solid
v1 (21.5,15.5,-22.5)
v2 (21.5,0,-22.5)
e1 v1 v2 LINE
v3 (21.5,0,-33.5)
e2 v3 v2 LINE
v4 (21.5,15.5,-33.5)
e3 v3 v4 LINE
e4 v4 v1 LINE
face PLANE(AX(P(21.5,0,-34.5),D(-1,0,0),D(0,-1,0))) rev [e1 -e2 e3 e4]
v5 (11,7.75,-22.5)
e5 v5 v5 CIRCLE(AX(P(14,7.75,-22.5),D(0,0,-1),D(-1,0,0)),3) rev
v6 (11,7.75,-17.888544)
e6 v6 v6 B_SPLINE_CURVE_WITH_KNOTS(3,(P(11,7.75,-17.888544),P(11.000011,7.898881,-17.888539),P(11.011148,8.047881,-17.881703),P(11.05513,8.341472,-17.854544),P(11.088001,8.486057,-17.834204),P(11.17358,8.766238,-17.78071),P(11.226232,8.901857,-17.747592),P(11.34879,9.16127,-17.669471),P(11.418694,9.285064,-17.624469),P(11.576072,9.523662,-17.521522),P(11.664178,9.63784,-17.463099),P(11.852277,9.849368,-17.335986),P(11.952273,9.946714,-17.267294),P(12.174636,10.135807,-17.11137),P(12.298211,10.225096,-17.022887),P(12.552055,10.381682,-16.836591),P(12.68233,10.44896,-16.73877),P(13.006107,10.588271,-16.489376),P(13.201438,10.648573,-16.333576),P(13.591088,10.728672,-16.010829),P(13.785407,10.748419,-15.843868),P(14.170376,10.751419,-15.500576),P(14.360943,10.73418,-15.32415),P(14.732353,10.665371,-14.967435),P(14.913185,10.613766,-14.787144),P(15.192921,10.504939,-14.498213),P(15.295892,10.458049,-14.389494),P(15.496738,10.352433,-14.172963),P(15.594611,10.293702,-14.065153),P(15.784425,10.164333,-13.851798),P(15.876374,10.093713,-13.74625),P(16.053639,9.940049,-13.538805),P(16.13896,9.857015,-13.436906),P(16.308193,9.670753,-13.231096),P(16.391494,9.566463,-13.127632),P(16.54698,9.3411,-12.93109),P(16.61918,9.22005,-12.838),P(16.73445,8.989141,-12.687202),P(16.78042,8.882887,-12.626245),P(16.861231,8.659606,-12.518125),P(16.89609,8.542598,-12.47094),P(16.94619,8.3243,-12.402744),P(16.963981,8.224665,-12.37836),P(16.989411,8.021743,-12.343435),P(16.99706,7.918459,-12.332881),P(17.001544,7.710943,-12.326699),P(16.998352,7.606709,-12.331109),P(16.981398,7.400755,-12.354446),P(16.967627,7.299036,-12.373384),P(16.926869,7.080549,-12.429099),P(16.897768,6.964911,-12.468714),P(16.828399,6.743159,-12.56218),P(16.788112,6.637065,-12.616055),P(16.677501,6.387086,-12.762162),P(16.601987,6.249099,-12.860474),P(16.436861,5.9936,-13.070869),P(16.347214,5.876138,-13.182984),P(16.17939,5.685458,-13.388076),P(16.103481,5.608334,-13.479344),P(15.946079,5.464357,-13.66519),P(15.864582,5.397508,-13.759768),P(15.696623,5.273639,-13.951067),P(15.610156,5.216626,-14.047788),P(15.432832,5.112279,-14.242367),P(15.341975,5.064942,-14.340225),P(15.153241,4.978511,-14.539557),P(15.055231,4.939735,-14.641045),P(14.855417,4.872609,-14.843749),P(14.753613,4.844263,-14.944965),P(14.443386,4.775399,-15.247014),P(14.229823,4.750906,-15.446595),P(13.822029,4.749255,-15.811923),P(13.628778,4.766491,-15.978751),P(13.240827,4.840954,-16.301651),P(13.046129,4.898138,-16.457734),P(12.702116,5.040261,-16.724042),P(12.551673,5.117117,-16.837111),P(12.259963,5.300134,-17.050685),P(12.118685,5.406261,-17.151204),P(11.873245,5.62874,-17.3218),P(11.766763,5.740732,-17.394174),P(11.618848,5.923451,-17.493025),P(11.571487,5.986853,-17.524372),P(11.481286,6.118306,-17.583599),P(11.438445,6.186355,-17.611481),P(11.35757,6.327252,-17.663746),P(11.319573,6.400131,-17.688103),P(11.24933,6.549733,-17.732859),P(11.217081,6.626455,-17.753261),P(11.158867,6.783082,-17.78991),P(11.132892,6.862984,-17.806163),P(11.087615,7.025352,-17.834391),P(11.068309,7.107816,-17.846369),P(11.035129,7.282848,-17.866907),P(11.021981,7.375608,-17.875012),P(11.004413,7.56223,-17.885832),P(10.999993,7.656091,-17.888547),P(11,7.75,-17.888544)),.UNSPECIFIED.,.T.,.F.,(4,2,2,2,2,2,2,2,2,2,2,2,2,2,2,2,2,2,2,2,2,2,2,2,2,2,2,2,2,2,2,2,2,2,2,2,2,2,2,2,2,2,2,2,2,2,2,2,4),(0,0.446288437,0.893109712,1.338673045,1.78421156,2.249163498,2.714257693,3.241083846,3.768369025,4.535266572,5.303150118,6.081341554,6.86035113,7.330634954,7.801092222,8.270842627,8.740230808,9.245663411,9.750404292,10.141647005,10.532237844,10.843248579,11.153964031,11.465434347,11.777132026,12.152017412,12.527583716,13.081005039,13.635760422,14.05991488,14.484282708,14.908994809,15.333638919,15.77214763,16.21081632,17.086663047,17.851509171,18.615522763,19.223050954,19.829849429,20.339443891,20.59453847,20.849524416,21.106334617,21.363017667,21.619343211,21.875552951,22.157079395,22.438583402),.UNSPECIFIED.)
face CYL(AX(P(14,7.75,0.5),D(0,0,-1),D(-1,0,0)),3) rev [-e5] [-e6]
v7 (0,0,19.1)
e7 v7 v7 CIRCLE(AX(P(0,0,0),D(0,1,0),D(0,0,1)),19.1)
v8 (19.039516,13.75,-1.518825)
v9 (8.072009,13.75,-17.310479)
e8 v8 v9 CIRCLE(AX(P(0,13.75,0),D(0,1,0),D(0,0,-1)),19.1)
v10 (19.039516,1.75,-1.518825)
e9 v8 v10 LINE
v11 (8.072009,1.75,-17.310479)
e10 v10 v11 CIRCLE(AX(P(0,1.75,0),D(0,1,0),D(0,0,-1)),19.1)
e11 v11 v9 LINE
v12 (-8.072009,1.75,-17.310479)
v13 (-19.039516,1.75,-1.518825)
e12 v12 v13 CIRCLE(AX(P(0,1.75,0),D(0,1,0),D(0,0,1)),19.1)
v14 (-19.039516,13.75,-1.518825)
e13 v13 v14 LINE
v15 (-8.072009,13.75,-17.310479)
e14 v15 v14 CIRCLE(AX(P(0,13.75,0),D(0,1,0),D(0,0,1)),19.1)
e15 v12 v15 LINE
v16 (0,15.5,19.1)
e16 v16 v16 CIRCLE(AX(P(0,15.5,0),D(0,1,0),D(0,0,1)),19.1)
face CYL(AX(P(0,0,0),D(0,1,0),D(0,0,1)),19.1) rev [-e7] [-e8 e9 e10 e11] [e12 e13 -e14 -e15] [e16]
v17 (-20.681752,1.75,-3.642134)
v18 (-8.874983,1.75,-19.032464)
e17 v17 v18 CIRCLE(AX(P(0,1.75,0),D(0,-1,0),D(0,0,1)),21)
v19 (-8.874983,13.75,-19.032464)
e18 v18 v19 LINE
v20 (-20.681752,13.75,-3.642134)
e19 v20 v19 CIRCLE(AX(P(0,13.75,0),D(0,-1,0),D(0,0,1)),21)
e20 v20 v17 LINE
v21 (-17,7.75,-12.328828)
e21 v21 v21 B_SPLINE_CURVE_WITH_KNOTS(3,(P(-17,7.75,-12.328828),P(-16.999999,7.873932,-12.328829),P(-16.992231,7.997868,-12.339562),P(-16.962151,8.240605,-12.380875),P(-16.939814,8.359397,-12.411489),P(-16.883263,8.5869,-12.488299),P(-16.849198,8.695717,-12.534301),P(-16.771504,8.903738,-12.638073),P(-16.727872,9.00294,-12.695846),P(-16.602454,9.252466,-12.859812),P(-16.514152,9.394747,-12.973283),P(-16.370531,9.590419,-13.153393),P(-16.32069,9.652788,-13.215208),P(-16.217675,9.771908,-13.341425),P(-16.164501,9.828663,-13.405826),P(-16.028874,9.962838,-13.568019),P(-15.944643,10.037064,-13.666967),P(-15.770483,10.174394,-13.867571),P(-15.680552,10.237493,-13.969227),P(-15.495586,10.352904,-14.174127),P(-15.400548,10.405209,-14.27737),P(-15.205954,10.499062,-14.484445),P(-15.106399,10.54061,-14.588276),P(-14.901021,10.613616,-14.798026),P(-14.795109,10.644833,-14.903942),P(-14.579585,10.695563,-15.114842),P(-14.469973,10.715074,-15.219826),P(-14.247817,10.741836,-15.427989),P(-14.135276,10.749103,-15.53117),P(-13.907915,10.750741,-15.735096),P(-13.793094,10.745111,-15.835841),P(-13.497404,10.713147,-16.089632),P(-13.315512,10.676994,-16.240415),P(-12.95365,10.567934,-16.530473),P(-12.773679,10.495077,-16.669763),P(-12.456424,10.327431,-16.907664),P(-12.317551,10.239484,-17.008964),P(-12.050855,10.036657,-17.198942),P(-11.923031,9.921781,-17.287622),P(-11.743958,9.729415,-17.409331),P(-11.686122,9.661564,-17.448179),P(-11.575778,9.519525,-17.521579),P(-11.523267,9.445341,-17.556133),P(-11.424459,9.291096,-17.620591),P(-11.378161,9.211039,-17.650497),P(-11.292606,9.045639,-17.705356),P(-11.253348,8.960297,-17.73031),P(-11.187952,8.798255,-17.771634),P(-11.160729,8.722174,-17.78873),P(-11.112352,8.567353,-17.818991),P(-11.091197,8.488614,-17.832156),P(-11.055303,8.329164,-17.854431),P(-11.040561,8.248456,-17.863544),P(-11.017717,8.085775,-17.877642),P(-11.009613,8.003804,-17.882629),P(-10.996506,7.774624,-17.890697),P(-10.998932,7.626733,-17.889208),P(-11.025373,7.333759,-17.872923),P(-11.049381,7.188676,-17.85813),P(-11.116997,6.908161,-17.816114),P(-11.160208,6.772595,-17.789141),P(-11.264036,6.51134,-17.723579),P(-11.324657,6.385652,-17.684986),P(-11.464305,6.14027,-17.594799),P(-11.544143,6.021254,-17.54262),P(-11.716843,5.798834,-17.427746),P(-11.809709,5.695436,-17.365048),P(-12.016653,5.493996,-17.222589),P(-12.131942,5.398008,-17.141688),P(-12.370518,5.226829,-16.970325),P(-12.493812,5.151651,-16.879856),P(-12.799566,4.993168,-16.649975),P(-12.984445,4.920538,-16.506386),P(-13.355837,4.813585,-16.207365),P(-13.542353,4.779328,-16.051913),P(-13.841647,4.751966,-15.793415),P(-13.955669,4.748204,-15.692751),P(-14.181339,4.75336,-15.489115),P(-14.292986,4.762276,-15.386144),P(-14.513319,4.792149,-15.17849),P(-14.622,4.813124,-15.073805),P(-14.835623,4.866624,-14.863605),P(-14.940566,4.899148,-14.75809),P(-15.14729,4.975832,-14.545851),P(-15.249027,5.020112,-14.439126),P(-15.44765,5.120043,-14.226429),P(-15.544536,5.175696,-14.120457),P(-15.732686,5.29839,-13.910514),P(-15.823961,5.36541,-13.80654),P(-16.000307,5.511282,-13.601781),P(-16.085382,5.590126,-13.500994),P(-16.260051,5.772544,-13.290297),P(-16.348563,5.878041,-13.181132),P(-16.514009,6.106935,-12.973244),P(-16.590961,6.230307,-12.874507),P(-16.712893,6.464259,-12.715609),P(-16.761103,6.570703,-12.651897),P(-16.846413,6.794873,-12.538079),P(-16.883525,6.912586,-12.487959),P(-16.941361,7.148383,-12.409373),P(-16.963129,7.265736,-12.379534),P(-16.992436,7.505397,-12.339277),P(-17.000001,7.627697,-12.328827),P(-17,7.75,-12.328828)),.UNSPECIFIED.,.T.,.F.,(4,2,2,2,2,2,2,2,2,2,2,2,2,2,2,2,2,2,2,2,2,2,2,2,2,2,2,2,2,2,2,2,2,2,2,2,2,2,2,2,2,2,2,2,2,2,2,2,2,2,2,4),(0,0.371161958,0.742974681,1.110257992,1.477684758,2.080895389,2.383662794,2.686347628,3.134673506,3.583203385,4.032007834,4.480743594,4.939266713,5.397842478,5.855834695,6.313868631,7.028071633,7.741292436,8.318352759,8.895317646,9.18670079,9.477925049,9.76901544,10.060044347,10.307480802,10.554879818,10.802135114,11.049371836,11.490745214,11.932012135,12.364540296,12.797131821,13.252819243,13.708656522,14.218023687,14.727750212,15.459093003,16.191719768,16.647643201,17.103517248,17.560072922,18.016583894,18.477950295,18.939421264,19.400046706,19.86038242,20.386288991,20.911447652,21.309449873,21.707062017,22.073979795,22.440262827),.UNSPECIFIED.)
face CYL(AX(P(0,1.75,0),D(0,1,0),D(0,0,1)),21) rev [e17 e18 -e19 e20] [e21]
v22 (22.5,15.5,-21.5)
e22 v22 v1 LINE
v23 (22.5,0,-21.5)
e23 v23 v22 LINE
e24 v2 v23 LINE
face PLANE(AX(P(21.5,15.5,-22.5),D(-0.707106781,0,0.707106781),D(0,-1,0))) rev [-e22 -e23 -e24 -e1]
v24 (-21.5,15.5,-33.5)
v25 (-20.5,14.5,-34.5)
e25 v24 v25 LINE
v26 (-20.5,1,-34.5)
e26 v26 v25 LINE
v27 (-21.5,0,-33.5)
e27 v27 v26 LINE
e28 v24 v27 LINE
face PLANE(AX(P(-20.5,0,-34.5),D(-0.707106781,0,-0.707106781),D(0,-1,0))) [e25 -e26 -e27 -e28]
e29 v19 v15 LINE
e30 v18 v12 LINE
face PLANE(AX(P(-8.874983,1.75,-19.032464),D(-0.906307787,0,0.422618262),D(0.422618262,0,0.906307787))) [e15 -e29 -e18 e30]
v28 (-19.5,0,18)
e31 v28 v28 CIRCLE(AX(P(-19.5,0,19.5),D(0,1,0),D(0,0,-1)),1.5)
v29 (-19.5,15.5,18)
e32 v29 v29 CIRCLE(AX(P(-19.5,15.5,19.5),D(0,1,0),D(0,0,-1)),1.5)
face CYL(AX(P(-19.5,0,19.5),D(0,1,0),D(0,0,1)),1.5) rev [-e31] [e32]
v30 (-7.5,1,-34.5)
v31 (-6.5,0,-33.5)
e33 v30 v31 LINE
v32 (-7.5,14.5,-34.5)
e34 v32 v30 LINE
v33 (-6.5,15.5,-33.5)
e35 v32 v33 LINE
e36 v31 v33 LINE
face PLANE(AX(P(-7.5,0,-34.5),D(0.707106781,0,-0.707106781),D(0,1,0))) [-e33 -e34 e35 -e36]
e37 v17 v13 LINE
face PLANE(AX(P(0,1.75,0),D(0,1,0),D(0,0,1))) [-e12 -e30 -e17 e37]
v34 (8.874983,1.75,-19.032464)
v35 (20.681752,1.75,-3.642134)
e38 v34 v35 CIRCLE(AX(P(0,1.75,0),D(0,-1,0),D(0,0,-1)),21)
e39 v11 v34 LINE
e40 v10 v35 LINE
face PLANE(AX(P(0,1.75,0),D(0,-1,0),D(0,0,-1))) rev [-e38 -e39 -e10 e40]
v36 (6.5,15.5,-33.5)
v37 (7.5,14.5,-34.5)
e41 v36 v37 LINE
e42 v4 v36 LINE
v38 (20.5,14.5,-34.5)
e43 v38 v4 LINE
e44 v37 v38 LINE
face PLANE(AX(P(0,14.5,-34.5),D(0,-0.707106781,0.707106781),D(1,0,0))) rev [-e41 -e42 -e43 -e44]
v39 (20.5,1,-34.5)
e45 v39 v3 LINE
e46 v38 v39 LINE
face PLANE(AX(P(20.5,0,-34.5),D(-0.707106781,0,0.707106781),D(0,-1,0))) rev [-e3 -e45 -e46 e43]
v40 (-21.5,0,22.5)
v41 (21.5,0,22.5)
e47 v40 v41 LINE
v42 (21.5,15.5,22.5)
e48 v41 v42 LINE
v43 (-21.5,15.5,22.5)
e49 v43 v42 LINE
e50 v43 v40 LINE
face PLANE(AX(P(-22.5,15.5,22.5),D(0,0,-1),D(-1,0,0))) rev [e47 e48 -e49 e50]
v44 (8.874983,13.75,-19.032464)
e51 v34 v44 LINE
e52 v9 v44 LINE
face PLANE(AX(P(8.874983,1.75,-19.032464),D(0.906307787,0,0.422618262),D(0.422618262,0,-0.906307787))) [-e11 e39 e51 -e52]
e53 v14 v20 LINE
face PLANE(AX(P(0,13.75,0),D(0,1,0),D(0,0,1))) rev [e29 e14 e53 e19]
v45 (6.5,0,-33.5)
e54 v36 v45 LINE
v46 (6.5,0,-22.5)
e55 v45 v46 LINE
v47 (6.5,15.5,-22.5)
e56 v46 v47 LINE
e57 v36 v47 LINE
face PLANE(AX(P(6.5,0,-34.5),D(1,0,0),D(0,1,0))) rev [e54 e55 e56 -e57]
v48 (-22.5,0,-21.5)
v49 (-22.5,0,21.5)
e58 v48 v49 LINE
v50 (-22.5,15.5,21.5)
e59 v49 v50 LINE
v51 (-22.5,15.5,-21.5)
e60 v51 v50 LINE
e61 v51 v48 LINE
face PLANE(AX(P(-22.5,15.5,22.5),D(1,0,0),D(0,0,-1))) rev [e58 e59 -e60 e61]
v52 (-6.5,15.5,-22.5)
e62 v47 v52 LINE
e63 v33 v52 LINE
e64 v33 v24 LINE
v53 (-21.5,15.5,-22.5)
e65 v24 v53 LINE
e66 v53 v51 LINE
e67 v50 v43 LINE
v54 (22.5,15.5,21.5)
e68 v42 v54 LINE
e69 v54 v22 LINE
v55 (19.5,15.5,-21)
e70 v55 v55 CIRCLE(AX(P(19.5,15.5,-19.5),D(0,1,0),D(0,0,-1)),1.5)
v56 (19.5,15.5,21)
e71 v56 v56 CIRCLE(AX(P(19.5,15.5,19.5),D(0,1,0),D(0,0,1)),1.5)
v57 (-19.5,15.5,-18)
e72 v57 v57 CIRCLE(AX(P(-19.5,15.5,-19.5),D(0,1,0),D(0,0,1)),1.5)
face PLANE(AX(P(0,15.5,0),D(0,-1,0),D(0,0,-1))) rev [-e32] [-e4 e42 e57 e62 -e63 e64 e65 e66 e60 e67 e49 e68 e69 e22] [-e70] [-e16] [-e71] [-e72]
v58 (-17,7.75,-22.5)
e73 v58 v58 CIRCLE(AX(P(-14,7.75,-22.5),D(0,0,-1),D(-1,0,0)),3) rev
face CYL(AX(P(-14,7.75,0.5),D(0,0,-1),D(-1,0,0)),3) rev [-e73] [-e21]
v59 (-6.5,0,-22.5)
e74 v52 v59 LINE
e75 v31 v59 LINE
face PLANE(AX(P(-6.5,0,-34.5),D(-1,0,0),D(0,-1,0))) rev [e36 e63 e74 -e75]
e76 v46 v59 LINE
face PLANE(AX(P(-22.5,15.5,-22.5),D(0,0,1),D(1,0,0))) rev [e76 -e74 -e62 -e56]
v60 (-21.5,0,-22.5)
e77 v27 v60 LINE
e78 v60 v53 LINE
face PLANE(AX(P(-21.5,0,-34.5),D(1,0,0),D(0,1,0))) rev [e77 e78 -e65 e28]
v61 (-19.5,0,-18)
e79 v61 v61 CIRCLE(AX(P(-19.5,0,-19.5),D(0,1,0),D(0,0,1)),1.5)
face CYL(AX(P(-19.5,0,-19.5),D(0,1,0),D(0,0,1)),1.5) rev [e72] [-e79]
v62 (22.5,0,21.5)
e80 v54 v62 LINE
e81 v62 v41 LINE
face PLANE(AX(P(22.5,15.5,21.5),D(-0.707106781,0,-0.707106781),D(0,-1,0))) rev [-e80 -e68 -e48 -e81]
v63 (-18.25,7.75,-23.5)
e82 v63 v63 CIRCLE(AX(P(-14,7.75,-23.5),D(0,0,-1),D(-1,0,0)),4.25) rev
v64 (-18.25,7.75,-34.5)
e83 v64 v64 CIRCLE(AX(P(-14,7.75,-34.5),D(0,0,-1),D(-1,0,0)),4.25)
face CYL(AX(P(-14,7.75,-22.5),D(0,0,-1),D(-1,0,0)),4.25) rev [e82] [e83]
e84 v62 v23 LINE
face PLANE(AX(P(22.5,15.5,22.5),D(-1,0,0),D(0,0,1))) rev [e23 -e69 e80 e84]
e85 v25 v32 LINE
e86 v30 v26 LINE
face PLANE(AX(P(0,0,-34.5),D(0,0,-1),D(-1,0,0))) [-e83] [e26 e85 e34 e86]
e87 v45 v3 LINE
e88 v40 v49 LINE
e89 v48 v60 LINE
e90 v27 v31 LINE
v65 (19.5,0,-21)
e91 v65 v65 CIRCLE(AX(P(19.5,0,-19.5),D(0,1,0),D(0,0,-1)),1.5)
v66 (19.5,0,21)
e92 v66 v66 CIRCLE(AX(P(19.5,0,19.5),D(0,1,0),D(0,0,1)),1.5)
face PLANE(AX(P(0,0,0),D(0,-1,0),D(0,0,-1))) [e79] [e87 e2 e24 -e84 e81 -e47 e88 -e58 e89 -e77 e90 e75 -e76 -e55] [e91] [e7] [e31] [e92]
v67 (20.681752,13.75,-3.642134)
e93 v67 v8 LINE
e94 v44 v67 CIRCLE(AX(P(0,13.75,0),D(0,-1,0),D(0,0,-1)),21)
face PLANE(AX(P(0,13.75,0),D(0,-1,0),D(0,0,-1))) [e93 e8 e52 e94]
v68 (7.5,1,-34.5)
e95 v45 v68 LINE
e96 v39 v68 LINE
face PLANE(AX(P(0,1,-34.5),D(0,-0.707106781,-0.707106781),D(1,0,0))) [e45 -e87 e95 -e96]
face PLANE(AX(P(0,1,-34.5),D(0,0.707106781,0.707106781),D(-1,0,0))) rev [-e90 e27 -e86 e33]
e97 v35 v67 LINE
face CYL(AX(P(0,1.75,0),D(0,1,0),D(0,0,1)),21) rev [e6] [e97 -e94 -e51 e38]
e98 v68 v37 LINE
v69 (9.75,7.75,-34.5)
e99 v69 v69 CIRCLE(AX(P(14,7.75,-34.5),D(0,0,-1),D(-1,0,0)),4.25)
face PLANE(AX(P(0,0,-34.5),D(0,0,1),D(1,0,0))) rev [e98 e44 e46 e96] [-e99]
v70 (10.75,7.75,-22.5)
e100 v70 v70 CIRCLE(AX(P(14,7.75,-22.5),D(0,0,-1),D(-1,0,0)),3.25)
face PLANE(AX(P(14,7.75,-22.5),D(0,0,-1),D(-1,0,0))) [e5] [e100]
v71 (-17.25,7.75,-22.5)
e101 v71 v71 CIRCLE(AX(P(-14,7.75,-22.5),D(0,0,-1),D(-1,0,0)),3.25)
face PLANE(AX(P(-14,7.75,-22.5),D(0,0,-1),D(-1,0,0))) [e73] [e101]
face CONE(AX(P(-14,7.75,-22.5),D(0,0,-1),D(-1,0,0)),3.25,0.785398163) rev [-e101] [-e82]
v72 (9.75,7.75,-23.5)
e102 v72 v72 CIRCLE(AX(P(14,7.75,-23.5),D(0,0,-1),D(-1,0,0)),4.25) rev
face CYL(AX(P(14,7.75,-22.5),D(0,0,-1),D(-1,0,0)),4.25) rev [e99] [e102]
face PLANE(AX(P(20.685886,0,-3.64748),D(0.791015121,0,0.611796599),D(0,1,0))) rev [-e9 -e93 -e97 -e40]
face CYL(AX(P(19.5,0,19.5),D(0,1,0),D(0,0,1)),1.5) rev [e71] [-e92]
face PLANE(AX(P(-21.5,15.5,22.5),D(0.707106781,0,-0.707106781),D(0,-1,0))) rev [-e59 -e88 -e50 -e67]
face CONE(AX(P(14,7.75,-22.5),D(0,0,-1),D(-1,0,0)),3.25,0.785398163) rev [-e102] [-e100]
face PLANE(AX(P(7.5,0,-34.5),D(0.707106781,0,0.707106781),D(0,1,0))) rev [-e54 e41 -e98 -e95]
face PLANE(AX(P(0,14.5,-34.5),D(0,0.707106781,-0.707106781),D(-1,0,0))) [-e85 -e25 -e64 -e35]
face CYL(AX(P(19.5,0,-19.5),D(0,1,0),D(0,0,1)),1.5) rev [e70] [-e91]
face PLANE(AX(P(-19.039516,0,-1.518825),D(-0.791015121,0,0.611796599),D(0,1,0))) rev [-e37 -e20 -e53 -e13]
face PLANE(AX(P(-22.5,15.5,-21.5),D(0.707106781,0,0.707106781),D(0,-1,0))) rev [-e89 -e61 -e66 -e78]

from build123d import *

# Parameters (mm, degrees)
SKETCH_1_W               = 45
SKETCH_1_H               = 45
EXTRUDE_1_DEPTH          = 15.5
SKETCH_2_R               = 19.1
CUT_EXTRUDE_1_DEPTH      = 36.394208566
SKETCH_5_W               = 15
SKETCH_5_H               = 15.5
EXTRUDE_2_DEPTH          = 12
SKETCH_6_R               = 3
CUT_EXTRUDE_4_DEPTH      = 35
SKETCH_7_R               = 1.5
CUT_EXTRUDE_5_DEPTH      = 45.008522016
CUT_EXTRUDE_6_DEPTH      = 6
CUT_EXTRUDE_6_DEPTH_BACK = 6
SKETCH_9_R               = 4.25
CUT_EXTRUDE_7_DEPTH      = 12
CHAMFER_2_SIZE           = 1
CHAMFER_3_SIZE           = 1
CHAMFER_4_SIZE           = 1


# Some blends are built 0.0001 mm under size
with BuildPart() as part:
    # 草图1 → 凸台-拉伸1 (new body)
    with BuildSketch(Plane(origin=(0, 0, 0), x_dir=(1, 0, 0), z_dir=(0, 1, 0))):
        Rectangle(SKETCH_1_W, SKETCH_1_H)
    extrude(amount=EXTRUDE_1_DEPTH)

    # 草图2 → 切除-拉伸1 (cut, through all)
    with BuildSketch(Plane(origin=(0, 15.5, 0), x_dir=(1, 0, 0), z_dir=(0, 1, 0))):
        with Locations(Location((0, 0, 0), (0, 0, 270))):
            Circle(SKETCH_2_R)
    extrude(amount=-CUT_EXTRUDE_1_DEPTH, mode=Mode.SUBTRACT)

    # 草图5 → 凸台-拉伸2 (add)
    with BuildSketch(Plane(origin=(0, 0, -22.5), x_dir=(-1, 0, 0), z_dir=(0, 0, -1))):
        with Locations((14, 7.75)):
            Rectangle(SKETCH_5_W, SKETCH_5_H)
        with Locations((-14, 7.75)):
            Rectangle(SKETCH_5_W, SKETCH_5_H)
    extrude(amount=EXTRUDE_2_DEPTH)

    # 草图6 → 切除-拉伸4 (cut)
    with BuildSketch(Plane(origin=(0, 0, -34.5), x_dir=(-1, 0, 0), z_dir=(0, 0, -1))):
        with Locations((-14, 7.75)):
            Circle(SKETCH_6_R)
        with Locations((14, 7.75)):
            Circle(SKETCH_6_R)
    extrude(amount=-CUT_EXTRUDE_4_DEPTH, mode=Mode.SUBTRACT)

    # 草图7 → 切除-拉伸5 (cut, through all)
    with BuildSketch(Plane(origin=(0, 15.5, 0), x_dir=(1, 0, 0), z_dir=(0, 1, 0))):
        with Locations(Location((-19.5, 19.5, 0), (0, 0, 270))):
            Circle(SKETCH_7_R)
        with Locations(Location((19.5, 19.5, 0), (0, 0, 90))):
            Circle(SKETCH_7_R)
        with Locations(Location((19.5, -19.5, 0), (0, 0, 270))):
            Circle(SKETCH_7_R)
        with Locations(Location((-19.5, -19.5, 0), (0, 0, 90))):
            Circle(SKETCH_7_R)
    extrude(amount=-CUT_EXTRUDE_5_DEPTH, mode=Mode.SUBTRACT)

    # 草图8 → 切除-拉伸6 (cut, two sides: drawn at the far end of the back side and taken through both)
    with BuildSketch(Plane(origin=(0, 7.75, 0), x_dir=(-1, 0, 0), z_dir=(0, -1, 0)).offset(-CUT_EXTRUDE_6_DEPTH_BACK)):
        with BuildLine():
            Line((-8.874983497, 19.032463528), (-8.072008799, 17.310478732))
            ThreePointArc((-8.072008799, 17.310478732), (-15.1530488, 11.627343294), (-18.809828083, 3.316680193))
            Line((-18.809828083, 3.316680193), (-20.680962813, 3.646611731))
            ThreePointArc((-20.680962813, 3.646611731), (-16.660420146, 12.783990009), (-8.874983497, 19.032463528))
        make_face()
        with BuildLine():
            Line((20.680962813, 3.646611731), (18.809828083, 3.316680193))
            ThreePointArc((18.809828083, 3.316680193), (15.1530488, 11.627343294), (8.072008799, 17.310478732))
            Line((8.072008799, 17.310478732), (8.874983497, 19.032463528))
            ThreePointArc((8.874983497, 19.032463528), (16.660420146, 12.783990009), (20.680962813, 3.646611731))
        make_face()
    extrude(amount=CUT_EXTRUDE_6_DEPTH + CUT_EXTRUDE_6_DEPTH_BACK, mode=Mode.SUBTRACT)

    # 草图9 → 切除-拉伸7 (cut)
    with BuildSketch(Plane(origin=(0, 0, -34.5), x_dir=(-1, 0, 0), z_dir=(0, 0, -1))):
        with Locations((-14, 7.75)):
            Circle(SKETCH_9_R)
        with Locations((14, 7.75)):
            Circle(SKETCH_9_R)
    extrude(amount=-CUT_EXTRUDE_7_DEPTH, mode=Mode.SUBTRACT)

    # 倒角1
    # the kernel refuses this chamfer: 2 mm, written as the material it takes off along each edge
    with BuildSketch(Plane(origin=(-18.809828083, 1.75, -3.316680193), x_dir=(-0.09666023054018325, 0, 0.9953174367165073), z_dir=(0, 1, 0))) as chamfer_1_piece_1_section:
        with BuildLine():
            Line((1.811638226, -0.054831322), (-0.147910468, -1.899248595))
            Line((-0.147910468, -1.899248595), (0, 0))
            ThreePointArc((0, 0), (0.933514183, -0.049753736), (1.811638226, -0.054831322))
        make_face()
    chamfer_1_piece_1 = extrude(amount=12, mode=Mode.PRIVATE)
    chamfer_1_piece_1 = chamfer_1_piece_1 & Plane(origin=(0, 7.75, 0), x_dir=(-0.42261826174070266, 0, -0.9063077870366485), z_dir=(0, 1, 0)) * Cylinder(21, 32, mode=Mode.PRIVATE)
    add(chamfer_1_piece_1, mode=Mode.SUBTRACT)
    with BuildSketch(Plane(origin=(18.809828083, 13.75, -3.316680193), x_dir=(0.09666023054018283, 0, 0.9953174367165073), z_dir=(0, -1, 0))) as chamfer_1_piece_2_section:
        with BuildLine():
            Line((1.811638226, -0.054831322), (-0.147910468, -1.899248595))
            Line((-0.147910468, -1.899248595), (0, 0))
            ThreePointArc((0, 0), (0.933514183, -0.049753736), (1.811638226, -0.054831322))
        make_face()
    chamfer_1_piece_2 = extrude(amount=12, mode=Mode.PRIVATE)
    chamfer_1_piece_2 = chamfer_1_piece_2 & Plane(origin=(0, 7.75, 0), x_dir=(0.9848077530122075, 0, -0.17364817766693397), z_dir=(0, 1, 0)) * Cylinder(21, 32, mode=Mode.PRIVATE)
    add(chamfer_1_piece_2, mode=Mode.SUBTRACT)

    # 倒角2
    chamfer_2_edges = [part.edges().sort_by_distance(p)[0] for p in [
        (22.5, 7.75, 22.5),
        (-22.5, 7.75, 22.5),
        (-22.5, 7.75, -22.5),
        (22.5, 7.75, -22.5),
    ]]
    chamfer(chamfer_2_edges, length=CHAMFER_2_SIZE - 0.0001)  # a hair under: the kernel refuses the full size

    # 倒角3
    chamfer_3_edges = [part.edges().sort_by_distance(p)[0] for p in [
        (18.25, 7.75, -22.5),
        (-9.75, 7.75, -22.5),
    ]]
    chamfer(chamfer_3_edges, length=CHAMFER_3_SIZE)

    # 倒角4
    chamfer_4_edges = [part.edges().sort_by_distance(p)[0] for p in [
        (6.5, 7.75, -34.5),
        (14, 15.5, -34.5),
        (21.5, 7.75, -34.5),
        (14, 0, -34.5),
        (-21.5, 7.75, -34.5),
        (-14, 15.5, -34.5),
        (-6.5, 7.75, -34.5),
        (-14, 0, -34.5),
    ]]
    chamfer(chamfer_4_edges, length=CHAMFER_4_SIZE)


solid = part.part
